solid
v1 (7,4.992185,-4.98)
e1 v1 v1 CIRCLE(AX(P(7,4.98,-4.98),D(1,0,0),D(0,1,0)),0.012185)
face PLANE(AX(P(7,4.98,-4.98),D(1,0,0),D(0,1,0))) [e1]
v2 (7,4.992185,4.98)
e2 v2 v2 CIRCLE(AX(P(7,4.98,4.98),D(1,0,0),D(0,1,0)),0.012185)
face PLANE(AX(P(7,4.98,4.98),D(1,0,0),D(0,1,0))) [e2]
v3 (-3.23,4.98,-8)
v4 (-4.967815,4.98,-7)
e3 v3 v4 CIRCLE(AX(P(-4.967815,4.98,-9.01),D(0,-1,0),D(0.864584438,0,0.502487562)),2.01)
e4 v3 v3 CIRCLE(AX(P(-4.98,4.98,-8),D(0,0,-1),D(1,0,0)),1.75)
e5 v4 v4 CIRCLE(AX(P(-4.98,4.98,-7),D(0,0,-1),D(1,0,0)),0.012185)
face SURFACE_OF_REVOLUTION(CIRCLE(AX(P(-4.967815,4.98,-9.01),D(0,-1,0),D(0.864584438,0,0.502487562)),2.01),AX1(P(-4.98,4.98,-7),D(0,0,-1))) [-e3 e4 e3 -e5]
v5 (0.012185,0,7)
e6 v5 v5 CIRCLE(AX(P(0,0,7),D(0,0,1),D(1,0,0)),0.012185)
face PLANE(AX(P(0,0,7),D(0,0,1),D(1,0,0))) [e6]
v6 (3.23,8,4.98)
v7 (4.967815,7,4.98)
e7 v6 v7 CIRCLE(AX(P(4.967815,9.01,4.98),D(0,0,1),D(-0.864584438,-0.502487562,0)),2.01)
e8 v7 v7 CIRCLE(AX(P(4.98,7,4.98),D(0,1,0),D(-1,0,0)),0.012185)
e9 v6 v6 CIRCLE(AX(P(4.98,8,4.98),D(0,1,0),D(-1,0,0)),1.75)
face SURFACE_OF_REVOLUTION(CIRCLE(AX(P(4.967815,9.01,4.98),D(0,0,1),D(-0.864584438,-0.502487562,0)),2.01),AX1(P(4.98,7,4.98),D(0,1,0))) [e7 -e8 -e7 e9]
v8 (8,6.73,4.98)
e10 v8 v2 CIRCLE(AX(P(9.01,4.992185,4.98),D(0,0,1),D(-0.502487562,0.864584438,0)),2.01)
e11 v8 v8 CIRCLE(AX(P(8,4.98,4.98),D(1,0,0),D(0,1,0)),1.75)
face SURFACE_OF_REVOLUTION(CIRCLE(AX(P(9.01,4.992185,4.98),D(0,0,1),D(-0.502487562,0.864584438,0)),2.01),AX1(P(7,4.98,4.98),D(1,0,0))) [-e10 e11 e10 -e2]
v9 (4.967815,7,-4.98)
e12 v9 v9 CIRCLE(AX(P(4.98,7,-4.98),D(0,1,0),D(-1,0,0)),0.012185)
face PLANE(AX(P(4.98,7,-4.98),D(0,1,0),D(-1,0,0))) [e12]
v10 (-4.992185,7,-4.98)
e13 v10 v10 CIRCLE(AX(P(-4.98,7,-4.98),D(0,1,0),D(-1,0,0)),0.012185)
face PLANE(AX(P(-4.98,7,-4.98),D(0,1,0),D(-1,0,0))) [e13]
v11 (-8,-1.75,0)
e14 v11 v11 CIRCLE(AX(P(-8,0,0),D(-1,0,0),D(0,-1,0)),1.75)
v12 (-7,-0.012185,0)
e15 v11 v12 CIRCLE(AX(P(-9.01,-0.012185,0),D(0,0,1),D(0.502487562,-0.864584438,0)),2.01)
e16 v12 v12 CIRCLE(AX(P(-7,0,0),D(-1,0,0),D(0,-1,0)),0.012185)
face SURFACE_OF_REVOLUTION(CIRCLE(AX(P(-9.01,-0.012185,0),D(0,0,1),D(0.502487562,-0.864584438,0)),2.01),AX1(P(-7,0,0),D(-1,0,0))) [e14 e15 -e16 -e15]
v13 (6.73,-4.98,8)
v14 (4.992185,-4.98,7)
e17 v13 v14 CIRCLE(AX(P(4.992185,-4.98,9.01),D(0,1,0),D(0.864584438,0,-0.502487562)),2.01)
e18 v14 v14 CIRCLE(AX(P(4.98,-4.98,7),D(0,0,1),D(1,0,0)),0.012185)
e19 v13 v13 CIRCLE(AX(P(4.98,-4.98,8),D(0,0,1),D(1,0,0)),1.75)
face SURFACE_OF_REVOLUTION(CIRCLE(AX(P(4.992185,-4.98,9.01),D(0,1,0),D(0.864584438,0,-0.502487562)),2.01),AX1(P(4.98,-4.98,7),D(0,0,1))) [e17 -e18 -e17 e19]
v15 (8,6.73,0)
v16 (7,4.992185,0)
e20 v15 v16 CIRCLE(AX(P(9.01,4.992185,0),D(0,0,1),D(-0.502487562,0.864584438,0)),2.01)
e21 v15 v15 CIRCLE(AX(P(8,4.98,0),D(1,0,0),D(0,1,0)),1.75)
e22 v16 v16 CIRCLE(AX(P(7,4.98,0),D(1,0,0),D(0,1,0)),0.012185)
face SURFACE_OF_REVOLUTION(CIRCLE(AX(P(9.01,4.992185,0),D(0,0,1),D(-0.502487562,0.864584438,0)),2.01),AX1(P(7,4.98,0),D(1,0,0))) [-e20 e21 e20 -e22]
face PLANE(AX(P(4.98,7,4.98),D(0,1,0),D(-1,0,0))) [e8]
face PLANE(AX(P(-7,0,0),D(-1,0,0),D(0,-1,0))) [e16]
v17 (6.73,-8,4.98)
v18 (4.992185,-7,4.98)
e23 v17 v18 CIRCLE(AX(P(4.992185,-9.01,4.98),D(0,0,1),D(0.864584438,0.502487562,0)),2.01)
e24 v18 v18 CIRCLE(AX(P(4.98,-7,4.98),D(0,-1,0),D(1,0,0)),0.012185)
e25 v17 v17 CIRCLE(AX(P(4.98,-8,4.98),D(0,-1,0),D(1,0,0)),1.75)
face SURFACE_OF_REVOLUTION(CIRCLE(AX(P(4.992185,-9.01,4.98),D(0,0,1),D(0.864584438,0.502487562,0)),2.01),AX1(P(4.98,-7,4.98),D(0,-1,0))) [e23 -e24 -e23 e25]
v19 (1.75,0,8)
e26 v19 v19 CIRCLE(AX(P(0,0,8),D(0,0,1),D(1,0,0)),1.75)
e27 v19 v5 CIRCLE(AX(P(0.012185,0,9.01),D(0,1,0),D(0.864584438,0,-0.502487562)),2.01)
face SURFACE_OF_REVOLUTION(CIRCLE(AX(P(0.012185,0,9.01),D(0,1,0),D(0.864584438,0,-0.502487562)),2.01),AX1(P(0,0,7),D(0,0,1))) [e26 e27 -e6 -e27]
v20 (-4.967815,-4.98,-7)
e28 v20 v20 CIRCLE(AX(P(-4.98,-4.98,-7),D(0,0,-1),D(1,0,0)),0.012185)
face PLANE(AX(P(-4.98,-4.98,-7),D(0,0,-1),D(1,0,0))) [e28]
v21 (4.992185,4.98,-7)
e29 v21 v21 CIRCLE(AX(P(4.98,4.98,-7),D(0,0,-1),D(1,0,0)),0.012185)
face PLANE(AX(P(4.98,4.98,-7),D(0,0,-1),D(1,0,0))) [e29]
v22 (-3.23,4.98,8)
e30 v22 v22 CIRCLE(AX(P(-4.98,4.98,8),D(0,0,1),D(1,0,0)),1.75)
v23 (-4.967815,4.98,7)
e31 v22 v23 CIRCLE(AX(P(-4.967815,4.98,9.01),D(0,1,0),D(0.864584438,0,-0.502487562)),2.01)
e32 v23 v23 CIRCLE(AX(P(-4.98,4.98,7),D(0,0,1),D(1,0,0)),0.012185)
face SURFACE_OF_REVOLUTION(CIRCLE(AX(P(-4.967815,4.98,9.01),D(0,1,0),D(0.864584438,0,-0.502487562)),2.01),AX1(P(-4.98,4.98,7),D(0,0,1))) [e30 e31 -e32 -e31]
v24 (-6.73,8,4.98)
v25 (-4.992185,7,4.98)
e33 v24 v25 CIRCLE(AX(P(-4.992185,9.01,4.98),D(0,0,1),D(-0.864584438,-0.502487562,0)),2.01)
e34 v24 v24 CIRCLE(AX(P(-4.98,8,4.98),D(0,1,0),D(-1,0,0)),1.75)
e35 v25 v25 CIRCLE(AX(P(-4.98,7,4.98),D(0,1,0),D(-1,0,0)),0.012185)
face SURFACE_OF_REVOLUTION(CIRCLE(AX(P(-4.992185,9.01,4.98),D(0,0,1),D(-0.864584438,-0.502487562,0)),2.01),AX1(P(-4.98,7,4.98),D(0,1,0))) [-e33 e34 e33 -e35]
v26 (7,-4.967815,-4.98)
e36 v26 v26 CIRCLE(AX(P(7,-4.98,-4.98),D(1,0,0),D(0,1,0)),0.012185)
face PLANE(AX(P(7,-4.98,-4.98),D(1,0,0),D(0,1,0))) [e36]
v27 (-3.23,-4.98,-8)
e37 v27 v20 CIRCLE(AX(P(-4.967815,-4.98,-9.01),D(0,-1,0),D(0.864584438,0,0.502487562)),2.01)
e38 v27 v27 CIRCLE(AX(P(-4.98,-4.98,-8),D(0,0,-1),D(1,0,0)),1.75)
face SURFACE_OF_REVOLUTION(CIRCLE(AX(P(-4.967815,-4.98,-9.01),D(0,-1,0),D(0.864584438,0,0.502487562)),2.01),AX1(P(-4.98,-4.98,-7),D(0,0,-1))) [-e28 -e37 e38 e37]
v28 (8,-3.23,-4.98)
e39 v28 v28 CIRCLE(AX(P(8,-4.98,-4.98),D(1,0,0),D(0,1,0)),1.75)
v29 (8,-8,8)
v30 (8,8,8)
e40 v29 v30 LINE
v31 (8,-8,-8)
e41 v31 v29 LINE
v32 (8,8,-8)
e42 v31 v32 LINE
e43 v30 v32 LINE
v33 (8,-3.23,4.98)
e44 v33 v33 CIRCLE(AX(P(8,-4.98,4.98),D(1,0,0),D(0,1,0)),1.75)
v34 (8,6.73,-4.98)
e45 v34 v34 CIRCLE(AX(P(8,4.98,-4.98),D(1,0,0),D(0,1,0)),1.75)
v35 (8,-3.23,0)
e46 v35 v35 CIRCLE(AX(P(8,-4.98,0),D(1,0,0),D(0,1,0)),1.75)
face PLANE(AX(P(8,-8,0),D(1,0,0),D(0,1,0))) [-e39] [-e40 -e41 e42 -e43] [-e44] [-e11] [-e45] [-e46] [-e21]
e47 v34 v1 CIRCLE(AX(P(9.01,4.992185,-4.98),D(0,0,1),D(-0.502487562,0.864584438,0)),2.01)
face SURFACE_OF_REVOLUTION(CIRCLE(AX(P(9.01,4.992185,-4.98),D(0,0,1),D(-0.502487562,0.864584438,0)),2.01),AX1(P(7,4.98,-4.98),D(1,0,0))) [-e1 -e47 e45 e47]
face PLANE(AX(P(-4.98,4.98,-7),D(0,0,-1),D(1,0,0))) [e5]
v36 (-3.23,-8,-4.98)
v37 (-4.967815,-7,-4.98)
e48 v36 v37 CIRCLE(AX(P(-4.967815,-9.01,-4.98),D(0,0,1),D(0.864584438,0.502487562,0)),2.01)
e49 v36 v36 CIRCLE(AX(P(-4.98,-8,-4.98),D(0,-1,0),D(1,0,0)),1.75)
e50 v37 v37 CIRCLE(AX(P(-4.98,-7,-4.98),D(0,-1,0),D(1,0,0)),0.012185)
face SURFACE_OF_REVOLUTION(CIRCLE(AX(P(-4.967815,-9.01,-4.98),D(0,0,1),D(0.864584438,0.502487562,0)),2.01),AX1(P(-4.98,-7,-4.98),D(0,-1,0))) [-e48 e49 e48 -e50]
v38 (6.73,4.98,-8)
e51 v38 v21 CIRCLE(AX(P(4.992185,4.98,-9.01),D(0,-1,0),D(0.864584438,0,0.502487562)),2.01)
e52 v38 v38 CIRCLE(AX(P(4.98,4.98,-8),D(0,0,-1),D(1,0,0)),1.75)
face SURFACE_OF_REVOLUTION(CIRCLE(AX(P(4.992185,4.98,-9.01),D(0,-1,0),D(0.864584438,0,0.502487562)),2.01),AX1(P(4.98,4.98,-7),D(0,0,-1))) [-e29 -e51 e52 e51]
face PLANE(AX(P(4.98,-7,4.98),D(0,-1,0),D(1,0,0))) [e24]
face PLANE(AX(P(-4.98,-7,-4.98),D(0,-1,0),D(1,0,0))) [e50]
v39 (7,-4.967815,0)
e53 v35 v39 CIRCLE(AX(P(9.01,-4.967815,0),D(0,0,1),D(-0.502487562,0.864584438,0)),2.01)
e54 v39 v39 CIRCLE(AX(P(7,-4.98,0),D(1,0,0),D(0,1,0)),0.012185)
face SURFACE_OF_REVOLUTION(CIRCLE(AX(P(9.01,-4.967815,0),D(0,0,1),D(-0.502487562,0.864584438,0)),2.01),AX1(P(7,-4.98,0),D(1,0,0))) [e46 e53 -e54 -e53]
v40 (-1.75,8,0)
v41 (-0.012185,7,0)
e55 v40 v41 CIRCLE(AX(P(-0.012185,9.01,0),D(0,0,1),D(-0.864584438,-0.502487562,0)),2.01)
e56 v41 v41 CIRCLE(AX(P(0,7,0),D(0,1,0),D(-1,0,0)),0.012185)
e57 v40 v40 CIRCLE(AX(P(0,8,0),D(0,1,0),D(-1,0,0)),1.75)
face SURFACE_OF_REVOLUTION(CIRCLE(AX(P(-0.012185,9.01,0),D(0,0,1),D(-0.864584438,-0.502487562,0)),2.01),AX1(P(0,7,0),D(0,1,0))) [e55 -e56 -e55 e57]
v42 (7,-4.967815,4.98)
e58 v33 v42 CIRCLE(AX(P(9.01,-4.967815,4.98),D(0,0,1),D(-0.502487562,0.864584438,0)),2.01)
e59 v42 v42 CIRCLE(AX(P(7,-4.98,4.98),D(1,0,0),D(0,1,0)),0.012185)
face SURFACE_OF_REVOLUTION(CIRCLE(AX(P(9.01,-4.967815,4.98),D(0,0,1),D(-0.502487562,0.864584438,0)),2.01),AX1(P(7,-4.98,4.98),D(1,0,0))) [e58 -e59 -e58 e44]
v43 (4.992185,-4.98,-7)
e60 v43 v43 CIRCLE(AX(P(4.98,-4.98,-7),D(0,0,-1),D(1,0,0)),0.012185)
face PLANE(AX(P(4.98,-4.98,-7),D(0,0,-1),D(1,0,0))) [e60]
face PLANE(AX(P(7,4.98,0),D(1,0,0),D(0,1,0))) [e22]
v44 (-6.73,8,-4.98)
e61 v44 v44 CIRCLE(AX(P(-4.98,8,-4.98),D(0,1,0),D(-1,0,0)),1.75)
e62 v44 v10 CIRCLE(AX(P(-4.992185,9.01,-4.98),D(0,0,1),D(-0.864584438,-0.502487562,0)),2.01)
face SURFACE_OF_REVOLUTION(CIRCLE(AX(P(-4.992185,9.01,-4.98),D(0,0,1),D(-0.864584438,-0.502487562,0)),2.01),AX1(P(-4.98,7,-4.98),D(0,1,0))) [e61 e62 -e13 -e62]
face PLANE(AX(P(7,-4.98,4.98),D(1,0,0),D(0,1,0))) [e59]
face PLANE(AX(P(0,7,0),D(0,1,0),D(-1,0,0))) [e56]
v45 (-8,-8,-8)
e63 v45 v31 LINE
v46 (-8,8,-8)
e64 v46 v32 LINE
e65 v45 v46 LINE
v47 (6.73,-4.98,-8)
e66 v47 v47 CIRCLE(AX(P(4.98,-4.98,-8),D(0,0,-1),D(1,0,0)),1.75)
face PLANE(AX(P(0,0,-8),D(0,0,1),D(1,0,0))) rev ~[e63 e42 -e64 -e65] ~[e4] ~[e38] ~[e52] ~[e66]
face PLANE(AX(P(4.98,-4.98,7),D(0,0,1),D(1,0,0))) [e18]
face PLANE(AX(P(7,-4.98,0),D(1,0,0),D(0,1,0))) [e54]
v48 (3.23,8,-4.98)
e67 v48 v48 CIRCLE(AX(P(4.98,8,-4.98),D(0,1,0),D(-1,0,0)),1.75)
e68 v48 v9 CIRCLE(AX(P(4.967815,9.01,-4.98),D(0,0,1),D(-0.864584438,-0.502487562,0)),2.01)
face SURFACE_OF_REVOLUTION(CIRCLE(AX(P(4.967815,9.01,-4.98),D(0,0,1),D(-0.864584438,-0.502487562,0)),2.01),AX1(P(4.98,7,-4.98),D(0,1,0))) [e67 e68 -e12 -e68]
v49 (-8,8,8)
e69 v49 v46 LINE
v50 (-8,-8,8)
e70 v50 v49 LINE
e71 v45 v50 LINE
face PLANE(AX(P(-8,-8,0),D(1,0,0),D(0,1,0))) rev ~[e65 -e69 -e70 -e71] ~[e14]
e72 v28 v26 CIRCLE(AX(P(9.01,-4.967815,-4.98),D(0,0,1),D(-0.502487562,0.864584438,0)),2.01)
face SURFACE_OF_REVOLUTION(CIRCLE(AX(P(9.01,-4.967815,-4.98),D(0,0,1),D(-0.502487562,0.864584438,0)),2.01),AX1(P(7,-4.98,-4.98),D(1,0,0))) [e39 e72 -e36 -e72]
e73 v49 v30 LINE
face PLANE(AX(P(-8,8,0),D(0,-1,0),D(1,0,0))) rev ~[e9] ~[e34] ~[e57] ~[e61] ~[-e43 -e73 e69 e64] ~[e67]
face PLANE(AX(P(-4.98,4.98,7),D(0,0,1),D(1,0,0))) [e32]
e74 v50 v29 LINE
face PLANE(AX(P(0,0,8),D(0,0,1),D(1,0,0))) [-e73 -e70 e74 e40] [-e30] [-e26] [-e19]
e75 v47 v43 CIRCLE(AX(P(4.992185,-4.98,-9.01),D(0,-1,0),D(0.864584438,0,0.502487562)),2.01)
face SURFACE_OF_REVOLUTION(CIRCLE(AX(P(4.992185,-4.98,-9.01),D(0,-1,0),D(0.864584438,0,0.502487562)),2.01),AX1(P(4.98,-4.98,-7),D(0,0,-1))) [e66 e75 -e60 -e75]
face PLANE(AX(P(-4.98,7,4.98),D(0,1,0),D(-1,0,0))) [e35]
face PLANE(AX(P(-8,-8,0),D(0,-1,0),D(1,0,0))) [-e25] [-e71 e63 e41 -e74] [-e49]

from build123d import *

# Parameters (mm, degrees)
F0_W      = 16
F0_H      = 16
F1_DEPTH  = 8
F2_R      = 1.75
F3_DEPTH  = 1
F4_R      = 1.75
F5_DEPTH  = 1
F6_R      = 1.75
F7_DEPTH  = 1
F8_R      = 1.75
F9_DEPTH  = 1
F10_R     = 1.75
F11_DEPTH = 1
F12_R     = 1.75
F13_DEPTH = 1


# Not quite as in the source:
# - a fillet or chamfer that OpenCascade refuses, or shapes differently, is made with other operations: its cross-section is extruded or revolved along the edge and cut away or added


with BuildPart() as f1:
    # F0 (on Top) → F1 (new body, symmetric)
    with BuildSketch(Plane.XY):
        Rectangle(F0_W, F0_H)
    extrude(amount=F1_DEPTH, both=True)

    # F2 (on face) → F3 (cut)
    with BuildSketch(Plane.XY.offset(8)):
        Circle(F2_R)
        with Locations((-4.98, 4.98)):
            Circle(F2_R)
        with Locations((4.98, -4.98)):
            Circle(F2_R)
    extrude(amount=-F3_DEPTH, mode=Mode.SUBTRACT)

    # F4 (on face) → F5 (cut)
    with BuildSketch(Plane.XZ.offset(8)):
        with Locations((4.98, 4.98)):
            Circle(F4_R)
        with Locations((-4.98, -4.98)):
            Circle(F4_R)
    extrude(amount=-F5_DEPTH, mode=Mode.SUBTRACT)

    # F6 (on face) → F7 (cut)
    with BuildSketch(Plane(origin=(-8, 0, 0), x_dir=(0, -1, 0), z_dir=(-1, 0, 0))):
        Circle(F6_R)
    extrude(amount=-F7_DEPTH, mode=Mode.SUBTRACT)

    # F8 (on face) → F9 (cut)
    with BuildSketch(Plane(origin=(0, 8, 0), x_dir=(-1, 0, 0), z_dir=(0, 1, 0))):
        Circle(F8_R)
        with Locations((-4.98, 4.98)):
            Circle(F8_R)
        with Locations((4.98, 4.98)):
            Circle(F8_R)
        with Locations((4.98, -4.98)):
            Circle(F8_R)
        with Locations((-4.98, -4.98)):
            Circle(F8_R)
    extrude(amount=-F9_DEPTH, mode=Mode.SUBTRACT)

    # F10 (on face) → F11 (cut)
    with BuildSketch(Plane(origin=(0, 0, -8), x_dir=(1, 0, 0), z_dir=(0, 0, -1))):
        with Locations((-4.98, 4.98)):
            Circle(F10_R)
        with Locations((4.98, 4.98)):
            Circle(F10_R)
        with Locations((4.98, -4.98)):
            Circle(F10_R)
        with Locations((-4.98, -4.98)):
            Circle(F10_R)
    extrude(amount=-F11_DEPTH, mode=Mode.SUBTRACT)

    # F12 (on face) → F13 (cut)
    with BuildSketch(Plane.YZ.offset(8)):
        with Locations((-4.98, 4.98)):
            Circle(F12_R)
        with Locations((-4.98, 0)):
            Circle(F12_R)
        with Locations((-4.98, -4.98)):
            Circle(F12_R)
        with Locations((4.98, -4.98)):
            Circle(F12_R)
        with Locations((4.98, 0)):
            Circle(F12_R)
        with Locations((4.98, 4.98)):
            Circle(F12_R)
    extrude(amount=-F13_DEPTH, mode=Mode.SUBTRACT)

    # F14: fillet of radius 2.01 on 21 edges, made by hand

    # F14_s1 → F14_t2 (revolve)
    with BuildSketch(Plane.XZ.offset(4.98)):
        with BuildLine():
            ThreePointArc((6.73, 8), (5.9946821631, 7.2678461606), (4.9921852803, 7))
            Line((4.9921852803, 7), (6.73, 7))
            Line((6.73, 7), (6.73, 8))
        make_face()
    revolve(axis=Axis((4.98, -4.98, 7), (0, 0, 1)))

    # F14_s3 → F14_t4 (revolve)
    with BuildSketch(Plane.XZ):
        with BuildLine():
            ThreePointArc((1.75, 8), (1.0146821631, 7.2678461606), (0.0121852803, 7))
            Line((0.0121852803, 7), (1.75, 7))
            Line((1.75, 7), (1.75, 8))
        make_face()
    revolve(axis=Axis((0, 0, 7), (0, 0, 1)))

    # F14_s5 → F14_t6 (revolve)
    with BuildSketch(Plane.XZ.offset(-4.98)):
        with BuildLine():
            ThreePointArc((-3.23, 8), (-3.9653178369, 7.2678461606), (-4.9678147197, 7))
            Line((-4.9678147197, 7), (-3.23, 7))
            Line((-3.23, 7), (-3.23, 8))
        make_face()
    revolve(axis=Axis((-4.98, 4.98, 7), (0, 0, 1)))

    # F14_s7 → F14_t8 (revolve)
    with BuildSketch(Plane.XY.offset(4.98)):
        with BuildLine():
            ThreePointArc((6.73, -8), (5.9946821631, -7.2678461606), (4.9921852803, -7))
            Line((4.9921852803, -7), (6.73, -7))
            Line((6.73, -7), (6.73, -8))
        make_face()
    revolve(axis=Axis((4.98, -7, 4.98), (0, -1, 0)))

    # F14_s9 → F14_t10 (revolve)
    with BuildSketch(Plane.XY.offset(-4.98)):
        with BuildLine():
            ThreePointArc((-3.23, -8), (-3.9653178369, -7.2678461606), (-4.9678147197, -7))
            Line((-4.9678147197, -7), (-3.23, -7))
            Line((-3.23, -7), (-3.23, -8))
        make_face()
    revolve(axis=Axis((-4.98, -7, -4.98), (0, -1, 0)))

    # F14_s11 → F14_t12 (revolve)
    with BuildSketch(Plane.XY):
        with BuildLine():
            ThreePointArc((-8, -1.75), (-7.2678461606, -1.0146821631), (-7, -0.0121852803))
            Line((-7, -0.0121852803), (-7, -1.75))
            Line((-7, -1.75), (-8, -1.75))
        make_face()
    revolve(axis=Axis((-7, 0, 0), (-1, 0, 0)))

    # F14_s13 → F14_t14 (revolve)
    with BuildSketch(Plane.XY.offset(4.98)):
        with BuildLine():
            ThreePointArc((3.23, 8), (3.9653178369, 7.2678461606), (4.9678147197, 7))
            Line((4.9678147197, 7), (3.23, 7))
            Line((3.23, 7), (3.23, 8))
        make_face()
    revolve(axis=Axis((4.98, 7, 4.98), (0, 1, 0)))

    # F14_s15 → F14_t16 (revolve)
    with BuildSketch(Plane.XY):
        with BuildLine():
            ThreePointArc((-1.75, 8), (-1.0146821631, 7.2678461606), (-0.0121852803, 7))
            Line((-0.0121852803, 7), (-1.75, 7))
            Line((-1.75, 7), (-1.75, 8))
        make_face()
    revolve(axis=Axis((0, 7, 0), (0, 1, 0)))

    # F14_s17 → F14_t18 (revolve)
    with BuildSketch(Plane.XY.offset(4.98)):
        with BuildLine():
            ThreePointArc((-6.73, 8), (-5.9946821631, 7.2678461606), (-4.9921852803, 7))
            Line((-4.9921852803, 7), (-6.73, 7))
            Line((-6.73, 7), (-6.73, 8))
        make_face()
    revolve(axis=Axis((-4.98, 7, 4.98), (0, 1, 0)))

    # F14_s19 → F14_t20 (revolve)
    with BuildSketch(Plane.XY.offset(-4.98)):
        with BuildLine():
            ThreePointArc((-6.73, 8), (-5.9946821631, 7.2678461606), (-4.9921852803, 7))
            Line((-4.9921852803, 7), (-6.73, 7))
            Line((-6.73, 7), (-6.73, 8))
        make_face()
    revolve(axis=Axis((-4.98, 7, -4.98), (0, 1, 0)))

    # F14_s21 → F14_t22 (revolve)
    with BuildSketch(Plane.XY.offset(-4.98)):
        with BuildLine():
            ThreePointArc((3.23, 8), (3.9653178369, 7.2678461606), (4.9678147197, 7))
            Line((4.9678147197, 7), (3.23, 7))
            Line((3.23, 7), (3.23, 8))
        make_face()
    revolve(axis=Axis((4.98, 7, -4.98), (0, 1, 0)))

    # F14_s23 → F14_t24 (revolve)
    with BuildSketch(Plane.XZ.offset(4.98)):
        with BuildLine():
            ThreePointArc((-3.23, -8), (-3.9653178369, -7.2678461606), (-4.9678147197, -7))
            Line((-4.9678147197, -7), (-3.23, -7))
            Line((-3.23, -7), (-3.23, -8))
        make_face()
    revolve(axis=Axis((-4.98, -4.98, -7), (0, 0, -1)))

    # F14_s25 → F14_t26 (revolve)
    with BuildSketch(Plane.XZ.offset(4.98)):
        with BuildLine():
            ThreePointArc((6.73, -8), (5.9946821631, -7.2678461606), (4.9921852803, -7))
            Line((4.9921852803, -7), (6.73, -7))
            Line((6.73, -7), (6.73, -8))
        make_face()
    revolve(axis=Axis((4.98, -4.98, -7), (0, 0, -1)))

    # F14_s27 → F14_t28 (revolve)
    with BuildSketch(Plane.XZ.offset(-4.98)):
        with BuildLine():
            ThreePointArc((6.73, -8), (5.9946821631, -7.2678461606), (4.9921852803, -7))
            Line((4.9921852803, -7), (6.73, -7))
            Line((6.73, -7), (6.73, -8))
        make_face()
    revolve(axis=Axis((4.98, 4.98, -7), (0, 0, -1)))

    # F14_s29 → F14_t30 (revolve)
    with BuildSketch(Plane.XZ.offset(-4.98)):
        with BuildLine():
            ThreePointArc((-3.23, -8), (-3.9653178369, -7.2678461606), (-4.9678147197, -7))
            Line((-4.9678147197, -7), (-3.23, -7))
            Line((-3.23, -7), (-3.23, -8))
        make_face()
    revolve(axis=Axis((-4.98, 4.98, -7), (0, 0, -1)))

    # F14_s31 → F14_t32 (revolve)
    with BuildSketch(Plane.XY):
        with BuildLine():
            ThreePointArc((8, 6.73), (7.2678461606, 5.9946821631), (7, 4.9921852803))
            Line((7, 4.9921852803), (7, 6.73))
            Line((7, 6.73), (8, 6.73))
        make_face()
    revolve(axis=Axis((7, 4.98, 0), (1, 0, 0)))

    # F14_s33 → F14_t34 (revolve)
    with BuildSketch(Plane.XY.offset(-4.98)):
        with BuildLine():
            ThreePointArc((8, 6.73), (7.2678461606, 5.9946821631), (7, 4.9921852803))
            Line((7, 4.9921852803), (7, 6.73))
            Line((7, 6.73), (8, 6.73))
        make_face()
    revolve(axis=Axis((7, 4.98, -4.98), (1, 0, 0)))

    # F14_s35 → F14_t36 (revolve)
    with BuildSketch(Plane.XY.offset(-4.98)):
        with BuildLine():
            ThreePointArc((8, -3.23), (7.2678461606, -3.9653178369), (7, -4.9678147197))
            Line((7, -4.9678147197), (7, -3.23))
            Line((7, -3.23), (8, -3.23))
        make_face()
    revolve(axis=Axis((7, -4.98, -4.98), (1, 0, 0)))

    # F14_s37 → F14_t38 (revolve)
    with BuildSketch(Plane.XY):
        with BuildLine():
            ThreePointArc((8, -3.23), (7.2678461606, -3.9653178369), (7, -4.9678147197))
            Line((7, -4.9678147197), (7, -3.23))
            Line((7, -3.23), (8, -3.23))
        make_face()
    revolve(axis=Axis((7, -4.98, 0), (1, 0, 0)))

    # F14_s39 → F14_t40 (revolve)
    with BuildSketch(Plane.XY.offset(4.98)):
        with BuildLine():
            ThreePointArc((8, -3.23), (7.2678461606, -3.9653178369), (7, -4.9678147197))
            Line((7, -4.9678147197), (7, -3.23))
            Line((7, -3.23), (8, -3.23))
        make_face()
    revolve(axis=Axis((7, -4.98, 4.98), (1, 0, 0)))

    # F14_s41 → F14_t42 (revolve)
    with BuildSketch(Plane.XY.offset(4.98)):
        with BuildLine():
            ThreePointArc((8, 6.73), (7.2678461606, 5.9946821631), (7, 4.9921852803))
            Line((7, 4.9921852803), (7, 6.73))
            Line((7, 6.73), (8, 6.73))
        make_face()
    revolve(axis=Axis((7, 4.98, 4.98), (1, 0, 0)))


solid = f1.part
